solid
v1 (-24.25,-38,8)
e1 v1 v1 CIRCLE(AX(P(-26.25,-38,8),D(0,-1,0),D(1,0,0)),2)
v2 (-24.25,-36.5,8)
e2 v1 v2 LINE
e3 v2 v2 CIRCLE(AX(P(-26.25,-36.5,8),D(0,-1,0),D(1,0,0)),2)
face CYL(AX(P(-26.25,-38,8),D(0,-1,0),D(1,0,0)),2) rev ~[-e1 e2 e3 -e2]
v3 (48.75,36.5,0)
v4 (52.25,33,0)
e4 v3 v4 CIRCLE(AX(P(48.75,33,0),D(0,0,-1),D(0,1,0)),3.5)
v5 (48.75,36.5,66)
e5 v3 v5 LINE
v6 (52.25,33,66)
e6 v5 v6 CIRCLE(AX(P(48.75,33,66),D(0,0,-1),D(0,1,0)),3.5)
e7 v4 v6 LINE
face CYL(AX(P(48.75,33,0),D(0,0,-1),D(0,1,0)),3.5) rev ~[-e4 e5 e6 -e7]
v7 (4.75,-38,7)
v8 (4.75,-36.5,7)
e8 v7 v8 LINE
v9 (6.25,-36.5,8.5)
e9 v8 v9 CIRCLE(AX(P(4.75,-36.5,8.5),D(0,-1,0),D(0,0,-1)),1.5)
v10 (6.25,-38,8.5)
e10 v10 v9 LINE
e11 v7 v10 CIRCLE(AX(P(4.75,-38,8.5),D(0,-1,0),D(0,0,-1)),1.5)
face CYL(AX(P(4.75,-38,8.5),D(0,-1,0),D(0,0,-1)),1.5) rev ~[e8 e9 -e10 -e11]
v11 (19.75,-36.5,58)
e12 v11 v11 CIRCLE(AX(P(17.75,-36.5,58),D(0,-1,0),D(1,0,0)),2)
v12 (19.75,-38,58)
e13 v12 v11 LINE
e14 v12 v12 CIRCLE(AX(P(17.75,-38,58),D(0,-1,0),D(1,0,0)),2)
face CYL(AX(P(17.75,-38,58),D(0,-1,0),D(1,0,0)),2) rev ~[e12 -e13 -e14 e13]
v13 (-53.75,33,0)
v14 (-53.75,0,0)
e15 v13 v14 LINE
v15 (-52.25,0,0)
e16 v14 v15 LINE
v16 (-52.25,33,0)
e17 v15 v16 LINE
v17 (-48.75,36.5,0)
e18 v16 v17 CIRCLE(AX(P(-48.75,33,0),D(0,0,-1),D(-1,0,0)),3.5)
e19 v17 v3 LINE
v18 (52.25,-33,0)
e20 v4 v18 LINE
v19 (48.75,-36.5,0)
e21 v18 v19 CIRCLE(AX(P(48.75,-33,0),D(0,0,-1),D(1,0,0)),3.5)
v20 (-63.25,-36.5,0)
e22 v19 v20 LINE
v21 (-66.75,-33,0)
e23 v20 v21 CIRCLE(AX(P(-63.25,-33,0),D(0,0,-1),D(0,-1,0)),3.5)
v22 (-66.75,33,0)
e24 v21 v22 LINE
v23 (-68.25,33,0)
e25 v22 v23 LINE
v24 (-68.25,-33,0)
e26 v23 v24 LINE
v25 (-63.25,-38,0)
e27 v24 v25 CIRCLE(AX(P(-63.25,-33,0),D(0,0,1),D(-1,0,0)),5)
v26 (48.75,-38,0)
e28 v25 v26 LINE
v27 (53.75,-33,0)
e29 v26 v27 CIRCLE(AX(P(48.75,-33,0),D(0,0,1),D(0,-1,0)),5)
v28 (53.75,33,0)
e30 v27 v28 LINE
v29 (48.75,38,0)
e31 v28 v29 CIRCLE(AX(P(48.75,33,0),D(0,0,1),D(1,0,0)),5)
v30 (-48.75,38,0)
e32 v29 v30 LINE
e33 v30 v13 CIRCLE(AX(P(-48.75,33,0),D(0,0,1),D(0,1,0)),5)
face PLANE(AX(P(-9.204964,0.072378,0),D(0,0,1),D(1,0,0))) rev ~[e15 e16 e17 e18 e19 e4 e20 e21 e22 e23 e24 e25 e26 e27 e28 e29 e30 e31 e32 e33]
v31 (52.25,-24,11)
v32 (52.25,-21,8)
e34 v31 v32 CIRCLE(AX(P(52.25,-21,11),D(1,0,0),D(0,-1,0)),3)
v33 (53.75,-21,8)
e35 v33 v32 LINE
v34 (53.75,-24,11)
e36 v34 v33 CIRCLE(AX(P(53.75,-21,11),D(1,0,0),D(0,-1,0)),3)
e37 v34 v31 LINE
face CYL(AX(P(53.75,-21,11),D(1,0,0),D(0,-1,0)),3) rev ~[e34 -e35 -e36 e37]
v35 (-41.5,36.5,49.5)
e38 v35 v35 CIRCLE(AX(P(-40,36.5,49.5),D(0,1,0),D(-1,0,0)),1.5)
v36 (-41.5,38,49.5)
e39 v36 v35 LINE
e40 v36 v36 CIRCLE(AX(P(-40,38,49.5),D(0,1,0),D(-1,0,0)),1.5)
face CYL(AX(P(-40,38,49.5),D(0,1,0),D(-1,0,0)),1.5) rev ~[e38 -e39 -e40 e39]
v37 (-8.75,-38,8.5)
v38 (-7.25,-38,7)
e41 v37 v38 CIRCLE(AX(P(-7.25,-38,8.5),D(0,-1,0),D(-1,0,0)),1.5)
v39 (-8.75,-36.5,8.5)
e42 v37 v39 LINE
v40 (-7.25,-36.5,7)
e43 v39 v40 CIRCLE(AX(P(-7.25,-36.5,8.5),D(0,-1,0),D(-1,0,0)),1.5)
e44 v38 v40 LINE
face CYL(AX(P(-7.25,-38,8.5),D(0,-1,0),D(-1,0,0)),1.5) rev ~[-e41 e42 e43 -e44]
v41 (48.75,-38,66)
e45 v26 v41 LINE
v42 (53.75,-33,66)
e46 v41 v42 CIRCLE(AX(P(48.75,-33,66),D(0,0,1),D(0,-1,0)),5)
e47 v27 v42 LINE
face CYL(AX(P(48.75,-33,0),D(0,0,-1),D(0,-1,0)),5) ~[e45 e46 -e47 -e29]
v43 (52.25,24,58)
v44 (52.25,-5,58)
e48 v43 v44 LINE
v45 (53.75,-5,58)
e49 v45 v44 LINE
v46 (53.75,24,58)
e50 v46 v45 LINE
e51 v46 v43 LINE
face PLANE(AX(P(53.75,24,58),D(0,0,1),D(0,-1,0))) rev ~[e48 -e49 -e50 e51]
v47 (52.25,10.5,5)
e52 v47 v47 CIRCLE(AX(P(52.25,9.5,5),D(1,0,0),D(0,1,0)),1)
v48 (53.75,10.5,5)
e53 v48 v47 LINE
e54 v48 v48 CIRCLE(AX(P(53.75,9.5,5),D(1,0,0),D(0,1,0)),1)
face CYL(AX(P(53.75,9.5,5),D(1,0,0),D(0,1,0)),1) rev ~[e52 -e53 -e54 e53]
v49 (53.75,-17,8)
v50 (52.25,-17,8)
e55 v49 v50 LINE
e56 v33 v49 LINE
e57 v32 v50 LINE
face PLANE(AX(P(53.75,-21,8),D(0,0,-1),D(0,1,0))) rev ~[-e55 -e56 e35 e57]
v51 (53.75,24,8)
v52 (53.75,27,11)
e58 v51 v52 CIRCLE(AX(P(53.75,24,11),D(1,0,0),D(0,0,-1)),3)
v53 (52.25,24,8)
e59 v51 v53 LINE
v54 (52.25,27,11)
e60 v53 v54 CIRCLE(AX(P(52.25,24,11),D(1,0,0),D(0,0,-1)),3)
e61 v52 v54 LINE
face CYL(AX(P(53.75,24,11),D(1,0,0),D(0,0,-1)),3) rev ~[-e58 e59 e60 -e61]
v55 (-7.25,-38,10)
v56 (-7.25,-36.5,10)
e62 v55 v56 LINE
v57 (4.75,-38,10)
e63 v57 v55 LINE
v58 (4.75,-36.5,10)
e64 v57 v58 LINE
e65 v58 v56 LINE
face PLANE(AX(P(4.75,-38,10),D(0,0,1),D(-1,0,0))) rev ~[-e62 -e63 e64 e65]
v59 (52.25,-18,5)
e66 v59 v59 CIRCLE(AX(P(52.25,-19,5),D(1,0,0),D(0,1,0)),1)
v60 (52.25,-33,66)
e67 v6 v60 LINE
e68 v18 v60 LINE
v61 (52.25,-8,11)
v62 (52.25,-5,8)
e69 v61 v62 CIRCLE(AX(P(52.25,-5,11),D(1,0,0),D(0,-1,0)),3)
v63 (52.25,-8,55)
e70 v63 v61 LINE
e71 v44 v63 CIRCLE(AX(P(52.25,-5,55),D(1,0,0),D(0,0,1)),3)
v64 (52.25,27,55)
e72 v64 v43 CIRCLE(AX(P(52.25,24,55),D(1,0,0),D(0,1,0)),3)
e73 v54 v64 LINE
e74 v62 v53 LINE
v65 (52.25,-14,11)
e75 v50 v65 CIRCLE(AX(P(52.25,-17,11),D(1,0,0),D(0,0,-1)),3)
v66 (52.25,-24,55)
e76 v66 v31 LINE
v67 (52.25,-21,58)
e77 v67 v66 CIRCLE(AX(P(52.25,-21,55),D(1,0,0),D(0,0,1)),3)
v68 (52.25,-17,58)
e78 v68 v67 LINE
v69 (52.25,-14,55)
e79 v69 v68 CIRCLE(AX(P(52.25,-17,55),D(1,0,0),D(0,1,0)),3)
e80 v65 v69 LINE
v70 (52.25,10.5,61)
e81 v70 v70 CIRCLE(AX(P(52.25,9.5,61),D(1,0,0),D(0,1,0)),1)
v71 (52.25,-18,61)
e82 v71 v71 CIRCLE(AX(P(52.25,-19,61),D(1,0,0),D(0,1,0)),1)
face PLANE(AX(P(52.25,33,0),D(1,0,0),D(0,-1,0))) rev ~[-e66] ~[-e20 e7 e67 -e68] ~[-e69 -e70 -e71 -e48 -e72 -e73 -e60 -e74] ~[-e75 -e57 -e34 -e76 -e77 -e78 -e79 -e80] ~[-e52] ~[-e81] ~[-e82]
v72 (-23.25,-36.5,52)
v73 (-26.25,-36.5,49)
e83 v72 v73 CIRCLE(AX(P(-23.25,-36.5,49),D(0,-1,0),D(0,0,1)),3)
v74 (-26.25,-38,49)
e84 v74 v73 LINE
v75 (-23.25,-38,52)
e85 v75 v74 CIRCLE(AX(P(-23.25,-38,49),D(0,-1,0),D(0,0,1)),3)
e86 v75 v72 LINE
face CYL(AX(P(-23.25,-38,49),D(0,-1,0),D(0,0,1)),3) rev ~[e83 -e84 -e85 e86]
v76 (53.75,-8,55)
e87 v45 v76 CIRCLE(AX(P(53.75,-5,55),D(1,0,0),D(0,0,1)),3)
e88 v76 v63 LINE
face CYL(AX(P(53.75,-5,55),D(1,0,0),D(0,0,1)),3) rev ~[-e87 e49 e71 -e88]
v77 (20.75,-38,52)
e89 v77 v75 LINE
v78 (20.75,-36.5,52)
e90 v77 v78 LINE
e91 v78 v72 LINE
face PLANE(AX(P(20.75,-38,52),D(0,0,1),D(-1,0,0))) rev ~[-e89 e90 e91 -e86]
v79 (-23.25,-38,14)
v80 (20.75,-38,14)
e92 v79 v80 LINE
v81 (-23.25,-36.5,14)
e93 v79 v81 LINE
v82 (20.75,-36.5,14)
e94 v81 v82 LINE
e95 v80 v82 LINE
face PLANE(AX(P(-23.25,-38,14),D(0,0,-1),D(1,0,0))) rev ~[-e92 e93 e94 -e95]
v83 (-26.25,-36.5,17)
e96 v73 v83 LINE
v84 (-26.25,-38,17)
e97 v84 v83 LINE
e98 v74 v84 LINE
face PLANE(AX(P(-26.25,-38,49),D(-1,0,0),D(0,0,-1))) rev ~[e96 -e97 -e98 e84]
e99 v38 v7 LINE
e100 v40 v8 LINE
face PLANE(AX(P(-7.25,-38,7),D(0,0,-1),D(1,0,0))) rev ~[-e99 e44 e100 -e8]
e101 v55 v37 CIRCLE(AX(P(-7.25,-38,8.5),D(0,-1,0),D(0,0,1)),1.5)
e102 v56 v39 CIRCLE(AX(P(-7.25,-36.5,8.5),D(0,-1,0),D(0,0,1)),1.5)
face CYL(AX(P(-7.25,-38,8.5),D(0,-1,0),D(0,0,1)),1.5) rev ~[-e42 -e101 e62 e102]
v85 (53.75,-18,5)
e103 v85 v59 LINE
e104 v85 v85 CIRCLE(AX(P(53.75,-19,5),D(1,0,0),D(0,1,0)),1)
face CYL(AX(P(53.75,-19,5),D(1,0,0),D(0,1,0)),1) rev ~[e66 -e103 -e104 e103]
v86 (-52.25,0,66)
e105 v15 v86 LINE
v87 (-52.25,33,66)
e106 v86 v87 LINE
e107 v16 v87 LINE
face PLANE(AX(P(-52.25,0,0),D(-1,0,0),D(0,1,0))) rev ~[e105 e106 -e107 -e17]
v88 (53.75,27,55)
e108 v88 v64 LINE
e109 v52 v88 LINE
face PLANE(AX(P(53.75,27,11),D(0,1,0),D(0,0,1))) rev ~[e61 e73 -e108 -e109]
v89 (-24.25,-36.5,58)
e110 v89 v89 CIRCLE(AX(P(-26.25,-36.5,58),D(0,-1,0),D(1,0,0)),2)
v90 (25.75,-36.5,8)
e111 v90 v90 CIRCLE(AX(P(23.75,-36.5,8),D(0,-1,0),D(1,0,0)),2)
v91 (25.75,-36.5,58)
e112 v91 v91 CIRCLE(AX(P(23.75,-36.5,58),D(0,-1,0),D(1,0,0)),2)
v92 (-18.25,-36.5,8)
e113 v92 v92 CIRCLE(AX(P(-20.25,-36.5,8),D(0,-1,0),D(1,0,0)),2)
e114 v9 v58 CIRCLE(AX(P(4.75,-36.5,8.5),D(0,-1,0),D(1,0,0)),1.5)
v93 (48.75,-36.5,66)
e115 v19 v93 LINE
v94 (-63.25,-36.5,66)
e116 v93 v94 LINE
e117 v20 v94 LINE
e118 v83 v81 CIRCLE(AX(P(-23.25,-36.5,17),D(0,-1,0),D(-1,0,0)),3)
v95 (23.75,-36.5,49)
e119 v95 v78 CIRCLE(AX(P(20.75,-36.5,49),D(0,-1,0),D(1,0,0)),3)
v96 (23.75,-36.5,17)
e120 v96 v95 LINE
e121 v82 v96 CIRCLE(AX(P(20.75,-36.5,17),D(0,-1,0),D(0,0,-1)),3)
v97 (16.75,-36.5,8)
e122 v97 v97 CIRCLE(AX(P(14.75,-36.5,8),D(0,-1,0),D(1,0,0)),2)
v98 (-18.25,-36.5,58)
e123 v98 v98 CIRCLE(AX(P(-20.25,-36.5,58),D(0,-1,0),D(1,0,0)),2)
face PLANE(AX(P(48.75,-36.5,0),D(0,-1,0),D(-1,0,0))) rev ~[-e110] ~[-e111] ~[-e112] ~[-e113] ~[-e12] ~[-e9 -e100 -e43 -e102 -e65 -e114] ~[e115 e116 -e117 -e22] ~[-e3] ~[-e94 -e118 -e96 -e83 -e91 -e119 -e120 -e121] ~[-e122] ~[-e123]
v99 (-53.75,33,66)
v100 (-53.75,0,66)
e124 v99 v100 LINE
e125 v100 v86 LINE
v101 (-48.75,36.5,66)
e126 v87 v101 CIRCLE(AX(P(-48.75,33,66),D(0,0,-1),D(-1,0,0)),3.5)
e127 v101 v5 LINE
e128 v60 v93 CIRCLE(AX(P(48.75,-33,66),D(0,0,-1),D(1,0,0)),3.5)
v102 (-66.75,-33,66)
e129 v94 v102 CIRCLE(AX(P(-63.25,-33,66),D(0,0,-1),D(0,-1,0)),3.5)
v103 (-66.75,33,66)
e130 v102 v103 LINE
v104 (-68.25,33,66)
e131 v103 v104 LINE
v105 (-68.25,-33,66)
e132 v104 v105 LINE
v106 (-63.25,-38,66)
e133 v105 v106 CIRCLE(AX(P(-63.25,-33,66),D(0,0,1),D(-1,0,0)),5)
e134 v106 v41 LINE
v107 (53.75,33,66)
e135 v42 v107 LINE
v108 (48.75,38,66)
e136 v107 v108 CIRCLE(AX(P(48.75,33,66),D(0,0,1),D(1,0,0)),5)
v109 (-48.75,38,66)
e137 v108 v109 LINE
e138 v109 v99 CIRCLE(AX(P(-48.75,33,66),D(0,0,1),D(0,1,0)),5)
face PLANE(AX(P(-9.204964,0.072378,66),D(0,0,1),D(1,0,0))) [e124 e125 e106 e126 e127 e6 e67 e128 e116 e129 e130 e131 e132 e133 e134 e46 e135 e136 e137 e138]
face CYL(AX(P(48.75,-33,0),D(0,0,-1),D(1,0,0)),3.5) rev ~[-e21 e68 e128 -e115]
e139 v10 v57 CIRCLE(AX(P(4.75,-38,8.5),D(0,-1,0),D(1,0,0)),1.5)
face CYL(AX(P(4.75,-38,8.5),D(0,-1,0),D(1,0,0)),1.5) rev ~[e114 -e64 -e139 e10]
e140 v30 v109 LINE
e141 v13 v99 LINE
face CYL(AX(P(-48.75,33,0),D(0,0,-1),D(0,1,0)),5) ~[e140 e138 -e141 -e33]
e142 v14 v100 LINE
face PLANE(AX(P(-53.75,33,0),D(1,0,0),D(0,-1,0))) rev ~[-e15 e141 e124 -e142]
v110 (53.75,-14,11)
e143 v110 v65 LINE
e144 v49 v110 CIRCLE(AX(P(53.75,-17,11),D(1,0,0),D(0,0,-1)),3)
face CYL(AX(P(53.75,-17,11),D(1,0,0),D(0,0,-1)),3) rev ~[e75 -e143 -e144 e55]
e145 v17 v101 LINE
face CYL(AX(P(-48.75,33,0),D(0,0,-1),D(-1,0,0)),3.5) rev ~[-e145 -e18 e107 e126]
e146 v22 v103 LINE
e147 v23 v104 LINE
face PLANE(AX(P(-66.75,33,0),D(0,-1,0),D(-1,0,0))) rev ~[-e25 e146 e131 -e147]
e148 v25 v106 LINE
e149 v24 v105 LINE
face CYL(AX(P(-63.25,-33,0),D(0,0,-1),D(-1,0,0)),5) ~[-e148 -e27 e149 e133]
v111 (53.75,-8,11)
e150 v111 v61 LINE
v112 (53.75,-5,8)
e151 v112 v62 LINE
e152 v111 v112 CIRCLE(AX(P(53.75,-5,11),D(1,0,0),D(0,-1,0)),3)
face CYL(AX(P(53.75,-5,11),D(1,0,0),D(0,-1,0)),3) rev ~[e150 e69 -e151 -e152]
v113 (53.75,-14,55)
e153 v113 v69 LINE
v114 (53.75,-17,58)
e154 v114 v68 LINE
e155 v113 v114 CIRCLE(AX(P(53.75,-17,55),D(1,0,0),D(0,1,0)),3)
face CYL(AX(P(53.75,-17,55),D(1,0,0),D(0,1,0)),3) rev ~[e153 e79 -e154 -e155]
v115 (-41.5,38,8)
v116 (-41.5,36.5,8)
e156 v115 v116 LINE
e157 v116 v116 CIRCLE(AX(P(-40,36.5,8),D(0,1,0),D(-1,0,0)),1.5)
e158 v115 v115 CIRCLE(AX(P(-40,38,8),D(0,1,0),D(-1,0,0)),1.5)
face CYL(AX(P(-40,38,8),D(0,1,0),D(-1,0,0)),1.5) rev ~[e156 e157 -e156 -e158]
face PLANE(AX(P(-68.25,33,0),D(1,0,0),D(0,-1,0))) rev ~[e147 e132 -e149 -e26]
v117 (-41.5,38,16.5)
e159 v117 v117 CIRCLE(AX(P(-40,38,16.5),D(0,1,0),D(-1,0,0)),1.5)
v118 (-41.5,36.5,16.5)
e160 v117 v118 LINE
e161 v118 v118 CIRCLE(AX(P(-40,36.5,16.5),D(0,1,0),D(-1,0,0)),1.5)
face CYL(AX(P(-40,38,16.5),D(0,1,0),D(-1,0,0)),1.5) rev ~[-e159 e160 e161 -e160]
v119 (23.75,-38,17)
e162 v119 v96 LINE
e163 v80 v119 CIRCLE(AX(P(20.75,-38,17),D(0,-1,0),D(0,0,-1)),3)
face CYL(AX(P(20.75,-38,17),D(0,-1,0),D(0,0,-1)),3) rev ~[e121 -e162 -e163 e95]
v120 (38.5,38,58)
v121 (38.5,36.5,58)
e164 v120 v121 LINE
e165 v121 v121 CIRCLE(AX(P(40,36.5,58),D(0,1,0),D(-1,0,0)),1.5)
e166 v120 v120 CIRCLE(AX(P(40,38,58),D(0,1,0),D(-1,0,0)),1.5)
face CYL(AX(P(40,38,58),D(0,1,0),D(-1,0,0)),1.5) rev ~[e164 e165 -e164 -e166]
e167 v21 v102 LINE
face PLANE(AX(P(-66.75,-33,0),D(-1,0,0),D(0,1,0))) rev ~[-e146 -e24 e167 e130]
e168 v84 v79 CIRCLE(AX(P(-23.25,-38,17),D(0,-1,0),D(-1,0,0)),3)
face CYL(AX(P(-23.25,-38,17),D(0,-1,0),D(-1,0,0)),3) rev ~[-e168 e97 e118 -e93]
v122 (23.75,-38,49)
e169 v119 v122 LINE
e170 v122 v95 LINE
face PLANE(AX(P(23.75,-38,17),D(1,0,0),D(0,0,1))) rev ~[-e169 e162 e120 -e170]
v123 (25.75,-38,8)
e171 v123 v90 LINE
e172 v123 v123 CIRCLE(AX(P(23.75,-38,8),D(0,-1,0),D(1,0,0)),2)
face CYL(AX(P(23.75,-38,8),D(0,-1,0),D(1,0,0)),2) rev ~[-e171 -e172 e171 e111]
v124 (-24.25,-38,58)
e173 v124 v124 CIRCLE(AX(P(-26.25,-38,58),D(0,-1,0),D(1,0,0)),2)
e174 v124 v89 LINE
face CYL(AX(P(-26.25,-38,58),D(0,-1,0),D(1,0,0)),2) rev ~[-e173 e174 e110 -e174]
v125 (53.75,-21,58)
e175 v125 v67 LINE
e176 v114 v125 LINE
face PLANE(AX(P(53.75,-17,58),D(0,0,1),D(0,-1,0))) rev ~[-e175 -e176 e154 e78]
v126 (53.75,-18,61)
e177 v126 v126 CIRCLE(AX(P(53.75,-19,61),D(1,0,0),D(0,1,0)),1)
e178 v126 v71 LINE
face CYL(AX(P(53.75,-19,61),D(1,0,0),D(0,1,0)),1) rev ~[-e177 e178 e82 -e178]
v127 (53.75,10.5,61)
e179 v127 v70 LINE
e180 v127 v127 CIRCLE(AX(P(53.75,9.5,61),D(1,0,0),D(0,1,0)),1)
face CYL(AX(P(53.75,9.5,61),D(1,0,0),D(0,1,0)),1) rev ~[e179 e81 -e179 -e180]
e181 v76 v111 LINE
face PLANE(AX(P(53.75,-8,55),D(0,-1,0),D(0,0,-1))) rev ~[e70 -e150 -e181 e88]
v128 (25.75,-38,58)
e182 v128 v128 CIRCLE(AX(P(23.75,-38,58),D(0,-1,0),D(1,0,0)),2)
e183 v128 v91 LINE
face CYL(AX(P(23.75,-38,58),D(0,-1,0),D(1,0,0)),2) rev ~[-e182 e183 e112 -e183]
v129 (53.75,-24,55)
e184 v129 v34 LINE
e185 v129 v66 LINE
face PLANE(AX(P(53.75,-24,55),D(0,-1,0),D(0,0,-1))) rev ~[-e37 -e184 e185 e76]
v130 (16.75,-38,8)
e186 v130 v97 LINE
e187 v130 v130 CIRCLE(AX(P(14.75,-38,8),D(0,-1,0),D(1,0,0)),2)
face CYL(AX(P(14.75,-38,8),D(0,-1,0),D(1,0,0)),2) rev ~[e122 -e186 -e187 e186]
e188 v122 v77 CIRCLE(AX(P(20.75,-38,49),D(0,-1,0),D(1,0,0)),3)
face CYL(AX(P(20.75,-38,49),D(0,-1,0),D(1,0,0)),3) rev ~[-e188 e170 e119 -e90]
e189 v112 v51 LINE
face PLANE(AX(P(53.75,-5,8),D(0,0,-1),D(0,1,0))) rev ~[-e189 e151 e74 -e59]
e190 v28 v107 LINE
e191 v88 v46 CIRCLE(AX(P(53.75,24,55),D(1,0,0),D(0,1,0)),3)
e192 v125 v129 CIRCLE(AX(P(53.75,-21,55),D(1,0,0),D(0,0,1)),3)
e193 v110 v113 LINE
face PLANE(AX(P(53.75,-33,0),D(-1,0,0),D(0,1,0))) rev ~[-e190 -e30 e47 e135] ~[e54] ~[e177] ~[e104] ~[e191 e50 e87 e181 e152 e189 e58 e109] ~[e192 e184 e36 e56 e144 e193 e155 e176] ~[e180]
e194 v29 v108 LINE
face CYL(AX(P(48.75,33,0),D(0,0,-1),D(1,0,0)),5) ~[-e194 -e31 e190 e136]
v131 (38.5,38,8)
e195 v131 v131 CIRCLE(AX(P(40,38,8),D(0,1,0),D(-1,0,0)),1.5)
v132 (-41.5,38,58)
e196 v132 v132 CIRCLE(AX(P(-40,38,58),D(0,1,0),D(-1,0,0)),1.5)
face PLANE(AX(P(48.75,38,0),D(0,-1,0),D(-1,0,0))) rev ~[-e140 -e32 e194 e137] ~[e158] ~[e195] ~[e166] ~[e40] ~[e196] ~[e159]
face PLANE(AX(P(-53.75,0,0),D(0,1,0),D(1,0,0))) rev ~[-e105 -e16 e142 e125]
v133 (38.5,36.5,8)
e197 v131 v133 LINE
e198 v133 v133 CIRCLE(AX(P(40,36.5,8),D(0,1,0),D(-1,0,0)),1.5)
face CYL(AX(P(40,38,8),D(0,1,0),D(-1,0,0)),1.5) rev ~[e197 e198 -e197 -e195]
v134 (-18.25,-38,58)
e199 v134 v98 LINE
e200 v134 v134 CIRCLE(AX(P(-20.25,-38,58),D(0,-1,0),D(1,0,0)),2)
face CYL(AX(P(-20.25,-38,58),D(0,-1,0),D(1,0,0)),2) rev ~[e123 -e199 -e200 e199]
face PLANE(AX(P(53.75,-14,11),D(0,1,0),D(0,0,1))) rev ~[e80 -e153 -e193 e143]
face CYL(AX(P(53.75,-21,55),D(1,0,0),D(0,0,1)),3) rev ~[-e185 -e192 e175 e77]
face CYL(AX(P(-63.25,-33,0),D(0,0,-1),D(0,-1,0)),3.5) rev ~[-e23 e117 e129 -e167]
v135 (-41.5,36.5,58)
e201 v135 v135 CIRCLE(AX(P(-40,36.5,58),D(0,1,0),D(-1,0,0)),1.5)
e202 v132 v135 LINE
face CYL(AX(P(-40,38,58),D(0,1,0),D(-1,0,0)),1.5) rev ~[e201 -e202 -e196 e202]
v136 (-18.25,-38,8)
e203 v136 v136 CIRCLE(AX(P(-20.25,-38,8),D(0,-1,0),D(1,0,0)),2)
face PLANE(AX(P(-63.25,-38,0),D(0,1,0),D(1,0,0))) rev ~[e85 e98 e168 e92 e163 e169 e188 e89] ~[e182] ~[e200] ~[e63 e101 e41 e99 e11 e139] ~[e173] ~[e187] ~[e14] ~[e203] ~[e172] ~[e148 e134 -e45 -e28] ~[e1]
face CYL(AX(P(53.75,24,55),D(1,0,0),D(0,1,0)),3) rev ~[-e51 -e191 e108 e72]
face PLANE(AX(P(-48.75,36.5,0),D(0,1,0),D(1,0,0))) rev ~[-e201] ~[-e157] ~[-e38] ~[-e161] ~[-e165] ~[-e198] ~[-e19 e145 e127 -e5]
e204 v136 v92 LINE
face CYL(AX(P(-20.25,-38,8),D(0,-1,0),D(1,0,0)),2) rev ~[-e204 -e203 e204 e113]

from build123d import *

# Parameters (mm, degrees)
F1_DEPTH = 66
F2_R     = 2
F3_DEPTH = 25
F4_R     = 1.5
F5_DEPTH = 25
F6_R     = 1
F7_DEPTH = 25


# Not quite as in the source:
# - a feature names something its author has since deleted; it is built from what else it names


with BuildPart() as f1:
    # F0 (on Top) → F1 (new body)
    with BuildSketch(Plane.XY):
        with BuildLine():
            Line((-66.75, -33), (-66.75, 33))
            Line((-66.75, 33), (-68.25, 33))
            Line((-68.25, 33), (-68.25, -33))
            ThreePointArc((-68.25, -33), (-66.7855339059, -36.5355339059), (-63.25, -38))
            Line((-63.25, -38), (48.75, -38))
            ThreePointArc((48.75, -38), (52.2855339059, -36.5355339059), (53.75, -33))
            Line((53.75, -33), (53.75, 33))
            ThreePointArc((53.75, 33), (52.2855339059, 36.5355339059), (48.75, 38))
            Line((48.75, 38), (-48.75, 38))
            ThreePointArc((-48.75, 38), (-52.2855339059, 36.5355339059), (-53.75, 33))
            Line((-53.75, 33), (-53.75, 0))
            Line((-53.75, 0), (-52.25, 0))
            Line((-52.25, 0), (-52.25, 33))
            ThreePointArc((-52.25, 33), (-51.2248737342, 35.4748737342), (-48.75, 36.5))
            Line((-48.75, 36.5), (48.75, 36.5))
            ThreePointArc((48.75, 36.5), (51.2248737342, 35.4748737342), (52.25, 33))
            Line((52.25, 33), (52.25, -33))
            ThreePointArc((52.25, -33), (51.2248737342, -35.4748737342), (48.75, -36.5))
            Line((48.75, -36.5), (-63.25, -36.5))
            ThreePointArc((-63.25, -36.5), (-65.7248737342, -35.4748737342), (-66.75, -33))
        make_face()
    extrude(amount=F1_DEPTH)

    # F2 (on face) → F3 (cut)
    with BuildSketch(Plane.XZ.offset(38)):
        with BuildLine():
            Line((20.75, 52), (-23.25, 52))
            ThreePointArc((-23.25, 52), (-25.3713203436, 51.1213203436), (-26.25, 49))
            Line((-26.25, 49), (-26.25, 17))
            ThreePointArc((-26.25, 17), (-25.3713203436, 14.8786796564), (-23.25, 14))
            Line((-23.25, 14), (20.75, 14))
            ThreePointArc((20.75, 14), (22.8713203436, 14.8786796564), (23.75, 17))
            Line((23.75, 17), (23.75, 49))
            ThreePointArc((23.75, 49), (22.8713203436, 51.1213203436), (20.75, 52))
        make_face()
        with Locations((-26.25, 58)):
            Circle(F2_R)
        with Locations((23.75, 58)):
            Circle(F2_R)
        with Locations((23.75, 8)):
            Circle(F2_R)
        with Locations((-26.25, 8)):
            Circle(F2_R)
        with BuildLine():
            ThreePointArc((-8.75, 8.5), (-8.3106601718, 7.4393398282), (-7.25, 7))
            Line((-7.25, 7), (4.75, 7))
            ThreePointArc((4.75, 7), (5.8106601718, 7.4393398282), (6.25, 8.5))
            ThreePointArc((6.25, 8.5), (5.8106601718, 9.5606601718), (4.75, 10))
            Line((4.75, 10), (-7.25, 10))
            ThreePointArc((-7.25, 10), (-8.3106601718, 9.5606601718), (-8.75, 8.5))
        make_face()
        with Locations((-20.25, 8)):
            Circle(F2_R)
        with Locations((-20.25, 58)):
            Circle(F2_R)
        with Locations((17.75, 58)):
            Circle(F2_R)
        with Locations((14.75, 8)):
            Circle(F2_R)
    extrude(amount=-F3_DEPTH, mode=Mode.SUBTRACT)

    # F4 (on face) → F5 (cut)
    with BuildSketch(Plane(origin=(0, 38, 0), x_dir=(-1, 0, 0), z_dir=(0, 1, 0))):
        with Locations((-40, 58)):
            Circle(F4_R)
        with Locations((-40, 8)):
            Circle(F4_R)
        with Locations((40, 8)):
            Circle(F4_R)
        with Locations((40, 58)):
            Circle(F4_R)
        with Locations((40, 16.5)):
            Circle(F4_R)
        with Locations((40, 49.5)):
            Circle(F4_R)
    extrude(amount=-F5_DEPTH, mode=Mode.SUBTRACT)

    # F6 (on face) → F7 (cut)
    with BuildSketch(Plane.YZ.offset(53.75)):
        with BuildLine():
            Line((-17, 58), (-21, 58))
            ThreePointArc((-21, 58), (-23.1213203436, 57.1213203436), (-24, 55))
            Line((-24, 55), (-24, 11))
            ThreePointArc((-24, 11), (-23.1213203436, 8.8786796564), (-21, 8))
            Line((-21, 8), (-17, 8))
            ThreePointArc((-17, 8), (-14.8786796564, 8.8786796564), (-14, 11))
            Line((-14, 11), (-14, 55))
            ThreePointArc((-14, 55), (-14.8786796564, 57.1213203436), (-17, 58))
        make_face()
        with BuildLine():
            Line((24, 58), (-5, 58))
            ThreePointArc((-5, 58), (-7.1213203436, 57.1213203436), (-8, 55))
            Line((-8, 55), (-8, 11))
            ThreePointArc((-8, 11), (-7.1213203436, 8.8786796564), (-5, 8))
            Line((-5, 8), (24, 8))
            ThreePointArc((24, 8), (26.1213203436, 8.8786796564), (27, 11))
            Line((27, 11), (27, 55))
            ThreePointArc((27, 55), (26.1213203436, 57.1213203436), (24, 58))
        make_face()
        with Locations((-19, 61)):
            Circle(F6_R)
        with Locations((9.5, 61)):
            Circle(F6_R)
        with Locations((9.5, 5)):
            Circle(F6_R)
        with Locations((-19, 5)):
            Circle(F6_R)
    extrude(amount=-F7_DEPTH, mode=Mode.SUBTRACT)


solid = f1.part
